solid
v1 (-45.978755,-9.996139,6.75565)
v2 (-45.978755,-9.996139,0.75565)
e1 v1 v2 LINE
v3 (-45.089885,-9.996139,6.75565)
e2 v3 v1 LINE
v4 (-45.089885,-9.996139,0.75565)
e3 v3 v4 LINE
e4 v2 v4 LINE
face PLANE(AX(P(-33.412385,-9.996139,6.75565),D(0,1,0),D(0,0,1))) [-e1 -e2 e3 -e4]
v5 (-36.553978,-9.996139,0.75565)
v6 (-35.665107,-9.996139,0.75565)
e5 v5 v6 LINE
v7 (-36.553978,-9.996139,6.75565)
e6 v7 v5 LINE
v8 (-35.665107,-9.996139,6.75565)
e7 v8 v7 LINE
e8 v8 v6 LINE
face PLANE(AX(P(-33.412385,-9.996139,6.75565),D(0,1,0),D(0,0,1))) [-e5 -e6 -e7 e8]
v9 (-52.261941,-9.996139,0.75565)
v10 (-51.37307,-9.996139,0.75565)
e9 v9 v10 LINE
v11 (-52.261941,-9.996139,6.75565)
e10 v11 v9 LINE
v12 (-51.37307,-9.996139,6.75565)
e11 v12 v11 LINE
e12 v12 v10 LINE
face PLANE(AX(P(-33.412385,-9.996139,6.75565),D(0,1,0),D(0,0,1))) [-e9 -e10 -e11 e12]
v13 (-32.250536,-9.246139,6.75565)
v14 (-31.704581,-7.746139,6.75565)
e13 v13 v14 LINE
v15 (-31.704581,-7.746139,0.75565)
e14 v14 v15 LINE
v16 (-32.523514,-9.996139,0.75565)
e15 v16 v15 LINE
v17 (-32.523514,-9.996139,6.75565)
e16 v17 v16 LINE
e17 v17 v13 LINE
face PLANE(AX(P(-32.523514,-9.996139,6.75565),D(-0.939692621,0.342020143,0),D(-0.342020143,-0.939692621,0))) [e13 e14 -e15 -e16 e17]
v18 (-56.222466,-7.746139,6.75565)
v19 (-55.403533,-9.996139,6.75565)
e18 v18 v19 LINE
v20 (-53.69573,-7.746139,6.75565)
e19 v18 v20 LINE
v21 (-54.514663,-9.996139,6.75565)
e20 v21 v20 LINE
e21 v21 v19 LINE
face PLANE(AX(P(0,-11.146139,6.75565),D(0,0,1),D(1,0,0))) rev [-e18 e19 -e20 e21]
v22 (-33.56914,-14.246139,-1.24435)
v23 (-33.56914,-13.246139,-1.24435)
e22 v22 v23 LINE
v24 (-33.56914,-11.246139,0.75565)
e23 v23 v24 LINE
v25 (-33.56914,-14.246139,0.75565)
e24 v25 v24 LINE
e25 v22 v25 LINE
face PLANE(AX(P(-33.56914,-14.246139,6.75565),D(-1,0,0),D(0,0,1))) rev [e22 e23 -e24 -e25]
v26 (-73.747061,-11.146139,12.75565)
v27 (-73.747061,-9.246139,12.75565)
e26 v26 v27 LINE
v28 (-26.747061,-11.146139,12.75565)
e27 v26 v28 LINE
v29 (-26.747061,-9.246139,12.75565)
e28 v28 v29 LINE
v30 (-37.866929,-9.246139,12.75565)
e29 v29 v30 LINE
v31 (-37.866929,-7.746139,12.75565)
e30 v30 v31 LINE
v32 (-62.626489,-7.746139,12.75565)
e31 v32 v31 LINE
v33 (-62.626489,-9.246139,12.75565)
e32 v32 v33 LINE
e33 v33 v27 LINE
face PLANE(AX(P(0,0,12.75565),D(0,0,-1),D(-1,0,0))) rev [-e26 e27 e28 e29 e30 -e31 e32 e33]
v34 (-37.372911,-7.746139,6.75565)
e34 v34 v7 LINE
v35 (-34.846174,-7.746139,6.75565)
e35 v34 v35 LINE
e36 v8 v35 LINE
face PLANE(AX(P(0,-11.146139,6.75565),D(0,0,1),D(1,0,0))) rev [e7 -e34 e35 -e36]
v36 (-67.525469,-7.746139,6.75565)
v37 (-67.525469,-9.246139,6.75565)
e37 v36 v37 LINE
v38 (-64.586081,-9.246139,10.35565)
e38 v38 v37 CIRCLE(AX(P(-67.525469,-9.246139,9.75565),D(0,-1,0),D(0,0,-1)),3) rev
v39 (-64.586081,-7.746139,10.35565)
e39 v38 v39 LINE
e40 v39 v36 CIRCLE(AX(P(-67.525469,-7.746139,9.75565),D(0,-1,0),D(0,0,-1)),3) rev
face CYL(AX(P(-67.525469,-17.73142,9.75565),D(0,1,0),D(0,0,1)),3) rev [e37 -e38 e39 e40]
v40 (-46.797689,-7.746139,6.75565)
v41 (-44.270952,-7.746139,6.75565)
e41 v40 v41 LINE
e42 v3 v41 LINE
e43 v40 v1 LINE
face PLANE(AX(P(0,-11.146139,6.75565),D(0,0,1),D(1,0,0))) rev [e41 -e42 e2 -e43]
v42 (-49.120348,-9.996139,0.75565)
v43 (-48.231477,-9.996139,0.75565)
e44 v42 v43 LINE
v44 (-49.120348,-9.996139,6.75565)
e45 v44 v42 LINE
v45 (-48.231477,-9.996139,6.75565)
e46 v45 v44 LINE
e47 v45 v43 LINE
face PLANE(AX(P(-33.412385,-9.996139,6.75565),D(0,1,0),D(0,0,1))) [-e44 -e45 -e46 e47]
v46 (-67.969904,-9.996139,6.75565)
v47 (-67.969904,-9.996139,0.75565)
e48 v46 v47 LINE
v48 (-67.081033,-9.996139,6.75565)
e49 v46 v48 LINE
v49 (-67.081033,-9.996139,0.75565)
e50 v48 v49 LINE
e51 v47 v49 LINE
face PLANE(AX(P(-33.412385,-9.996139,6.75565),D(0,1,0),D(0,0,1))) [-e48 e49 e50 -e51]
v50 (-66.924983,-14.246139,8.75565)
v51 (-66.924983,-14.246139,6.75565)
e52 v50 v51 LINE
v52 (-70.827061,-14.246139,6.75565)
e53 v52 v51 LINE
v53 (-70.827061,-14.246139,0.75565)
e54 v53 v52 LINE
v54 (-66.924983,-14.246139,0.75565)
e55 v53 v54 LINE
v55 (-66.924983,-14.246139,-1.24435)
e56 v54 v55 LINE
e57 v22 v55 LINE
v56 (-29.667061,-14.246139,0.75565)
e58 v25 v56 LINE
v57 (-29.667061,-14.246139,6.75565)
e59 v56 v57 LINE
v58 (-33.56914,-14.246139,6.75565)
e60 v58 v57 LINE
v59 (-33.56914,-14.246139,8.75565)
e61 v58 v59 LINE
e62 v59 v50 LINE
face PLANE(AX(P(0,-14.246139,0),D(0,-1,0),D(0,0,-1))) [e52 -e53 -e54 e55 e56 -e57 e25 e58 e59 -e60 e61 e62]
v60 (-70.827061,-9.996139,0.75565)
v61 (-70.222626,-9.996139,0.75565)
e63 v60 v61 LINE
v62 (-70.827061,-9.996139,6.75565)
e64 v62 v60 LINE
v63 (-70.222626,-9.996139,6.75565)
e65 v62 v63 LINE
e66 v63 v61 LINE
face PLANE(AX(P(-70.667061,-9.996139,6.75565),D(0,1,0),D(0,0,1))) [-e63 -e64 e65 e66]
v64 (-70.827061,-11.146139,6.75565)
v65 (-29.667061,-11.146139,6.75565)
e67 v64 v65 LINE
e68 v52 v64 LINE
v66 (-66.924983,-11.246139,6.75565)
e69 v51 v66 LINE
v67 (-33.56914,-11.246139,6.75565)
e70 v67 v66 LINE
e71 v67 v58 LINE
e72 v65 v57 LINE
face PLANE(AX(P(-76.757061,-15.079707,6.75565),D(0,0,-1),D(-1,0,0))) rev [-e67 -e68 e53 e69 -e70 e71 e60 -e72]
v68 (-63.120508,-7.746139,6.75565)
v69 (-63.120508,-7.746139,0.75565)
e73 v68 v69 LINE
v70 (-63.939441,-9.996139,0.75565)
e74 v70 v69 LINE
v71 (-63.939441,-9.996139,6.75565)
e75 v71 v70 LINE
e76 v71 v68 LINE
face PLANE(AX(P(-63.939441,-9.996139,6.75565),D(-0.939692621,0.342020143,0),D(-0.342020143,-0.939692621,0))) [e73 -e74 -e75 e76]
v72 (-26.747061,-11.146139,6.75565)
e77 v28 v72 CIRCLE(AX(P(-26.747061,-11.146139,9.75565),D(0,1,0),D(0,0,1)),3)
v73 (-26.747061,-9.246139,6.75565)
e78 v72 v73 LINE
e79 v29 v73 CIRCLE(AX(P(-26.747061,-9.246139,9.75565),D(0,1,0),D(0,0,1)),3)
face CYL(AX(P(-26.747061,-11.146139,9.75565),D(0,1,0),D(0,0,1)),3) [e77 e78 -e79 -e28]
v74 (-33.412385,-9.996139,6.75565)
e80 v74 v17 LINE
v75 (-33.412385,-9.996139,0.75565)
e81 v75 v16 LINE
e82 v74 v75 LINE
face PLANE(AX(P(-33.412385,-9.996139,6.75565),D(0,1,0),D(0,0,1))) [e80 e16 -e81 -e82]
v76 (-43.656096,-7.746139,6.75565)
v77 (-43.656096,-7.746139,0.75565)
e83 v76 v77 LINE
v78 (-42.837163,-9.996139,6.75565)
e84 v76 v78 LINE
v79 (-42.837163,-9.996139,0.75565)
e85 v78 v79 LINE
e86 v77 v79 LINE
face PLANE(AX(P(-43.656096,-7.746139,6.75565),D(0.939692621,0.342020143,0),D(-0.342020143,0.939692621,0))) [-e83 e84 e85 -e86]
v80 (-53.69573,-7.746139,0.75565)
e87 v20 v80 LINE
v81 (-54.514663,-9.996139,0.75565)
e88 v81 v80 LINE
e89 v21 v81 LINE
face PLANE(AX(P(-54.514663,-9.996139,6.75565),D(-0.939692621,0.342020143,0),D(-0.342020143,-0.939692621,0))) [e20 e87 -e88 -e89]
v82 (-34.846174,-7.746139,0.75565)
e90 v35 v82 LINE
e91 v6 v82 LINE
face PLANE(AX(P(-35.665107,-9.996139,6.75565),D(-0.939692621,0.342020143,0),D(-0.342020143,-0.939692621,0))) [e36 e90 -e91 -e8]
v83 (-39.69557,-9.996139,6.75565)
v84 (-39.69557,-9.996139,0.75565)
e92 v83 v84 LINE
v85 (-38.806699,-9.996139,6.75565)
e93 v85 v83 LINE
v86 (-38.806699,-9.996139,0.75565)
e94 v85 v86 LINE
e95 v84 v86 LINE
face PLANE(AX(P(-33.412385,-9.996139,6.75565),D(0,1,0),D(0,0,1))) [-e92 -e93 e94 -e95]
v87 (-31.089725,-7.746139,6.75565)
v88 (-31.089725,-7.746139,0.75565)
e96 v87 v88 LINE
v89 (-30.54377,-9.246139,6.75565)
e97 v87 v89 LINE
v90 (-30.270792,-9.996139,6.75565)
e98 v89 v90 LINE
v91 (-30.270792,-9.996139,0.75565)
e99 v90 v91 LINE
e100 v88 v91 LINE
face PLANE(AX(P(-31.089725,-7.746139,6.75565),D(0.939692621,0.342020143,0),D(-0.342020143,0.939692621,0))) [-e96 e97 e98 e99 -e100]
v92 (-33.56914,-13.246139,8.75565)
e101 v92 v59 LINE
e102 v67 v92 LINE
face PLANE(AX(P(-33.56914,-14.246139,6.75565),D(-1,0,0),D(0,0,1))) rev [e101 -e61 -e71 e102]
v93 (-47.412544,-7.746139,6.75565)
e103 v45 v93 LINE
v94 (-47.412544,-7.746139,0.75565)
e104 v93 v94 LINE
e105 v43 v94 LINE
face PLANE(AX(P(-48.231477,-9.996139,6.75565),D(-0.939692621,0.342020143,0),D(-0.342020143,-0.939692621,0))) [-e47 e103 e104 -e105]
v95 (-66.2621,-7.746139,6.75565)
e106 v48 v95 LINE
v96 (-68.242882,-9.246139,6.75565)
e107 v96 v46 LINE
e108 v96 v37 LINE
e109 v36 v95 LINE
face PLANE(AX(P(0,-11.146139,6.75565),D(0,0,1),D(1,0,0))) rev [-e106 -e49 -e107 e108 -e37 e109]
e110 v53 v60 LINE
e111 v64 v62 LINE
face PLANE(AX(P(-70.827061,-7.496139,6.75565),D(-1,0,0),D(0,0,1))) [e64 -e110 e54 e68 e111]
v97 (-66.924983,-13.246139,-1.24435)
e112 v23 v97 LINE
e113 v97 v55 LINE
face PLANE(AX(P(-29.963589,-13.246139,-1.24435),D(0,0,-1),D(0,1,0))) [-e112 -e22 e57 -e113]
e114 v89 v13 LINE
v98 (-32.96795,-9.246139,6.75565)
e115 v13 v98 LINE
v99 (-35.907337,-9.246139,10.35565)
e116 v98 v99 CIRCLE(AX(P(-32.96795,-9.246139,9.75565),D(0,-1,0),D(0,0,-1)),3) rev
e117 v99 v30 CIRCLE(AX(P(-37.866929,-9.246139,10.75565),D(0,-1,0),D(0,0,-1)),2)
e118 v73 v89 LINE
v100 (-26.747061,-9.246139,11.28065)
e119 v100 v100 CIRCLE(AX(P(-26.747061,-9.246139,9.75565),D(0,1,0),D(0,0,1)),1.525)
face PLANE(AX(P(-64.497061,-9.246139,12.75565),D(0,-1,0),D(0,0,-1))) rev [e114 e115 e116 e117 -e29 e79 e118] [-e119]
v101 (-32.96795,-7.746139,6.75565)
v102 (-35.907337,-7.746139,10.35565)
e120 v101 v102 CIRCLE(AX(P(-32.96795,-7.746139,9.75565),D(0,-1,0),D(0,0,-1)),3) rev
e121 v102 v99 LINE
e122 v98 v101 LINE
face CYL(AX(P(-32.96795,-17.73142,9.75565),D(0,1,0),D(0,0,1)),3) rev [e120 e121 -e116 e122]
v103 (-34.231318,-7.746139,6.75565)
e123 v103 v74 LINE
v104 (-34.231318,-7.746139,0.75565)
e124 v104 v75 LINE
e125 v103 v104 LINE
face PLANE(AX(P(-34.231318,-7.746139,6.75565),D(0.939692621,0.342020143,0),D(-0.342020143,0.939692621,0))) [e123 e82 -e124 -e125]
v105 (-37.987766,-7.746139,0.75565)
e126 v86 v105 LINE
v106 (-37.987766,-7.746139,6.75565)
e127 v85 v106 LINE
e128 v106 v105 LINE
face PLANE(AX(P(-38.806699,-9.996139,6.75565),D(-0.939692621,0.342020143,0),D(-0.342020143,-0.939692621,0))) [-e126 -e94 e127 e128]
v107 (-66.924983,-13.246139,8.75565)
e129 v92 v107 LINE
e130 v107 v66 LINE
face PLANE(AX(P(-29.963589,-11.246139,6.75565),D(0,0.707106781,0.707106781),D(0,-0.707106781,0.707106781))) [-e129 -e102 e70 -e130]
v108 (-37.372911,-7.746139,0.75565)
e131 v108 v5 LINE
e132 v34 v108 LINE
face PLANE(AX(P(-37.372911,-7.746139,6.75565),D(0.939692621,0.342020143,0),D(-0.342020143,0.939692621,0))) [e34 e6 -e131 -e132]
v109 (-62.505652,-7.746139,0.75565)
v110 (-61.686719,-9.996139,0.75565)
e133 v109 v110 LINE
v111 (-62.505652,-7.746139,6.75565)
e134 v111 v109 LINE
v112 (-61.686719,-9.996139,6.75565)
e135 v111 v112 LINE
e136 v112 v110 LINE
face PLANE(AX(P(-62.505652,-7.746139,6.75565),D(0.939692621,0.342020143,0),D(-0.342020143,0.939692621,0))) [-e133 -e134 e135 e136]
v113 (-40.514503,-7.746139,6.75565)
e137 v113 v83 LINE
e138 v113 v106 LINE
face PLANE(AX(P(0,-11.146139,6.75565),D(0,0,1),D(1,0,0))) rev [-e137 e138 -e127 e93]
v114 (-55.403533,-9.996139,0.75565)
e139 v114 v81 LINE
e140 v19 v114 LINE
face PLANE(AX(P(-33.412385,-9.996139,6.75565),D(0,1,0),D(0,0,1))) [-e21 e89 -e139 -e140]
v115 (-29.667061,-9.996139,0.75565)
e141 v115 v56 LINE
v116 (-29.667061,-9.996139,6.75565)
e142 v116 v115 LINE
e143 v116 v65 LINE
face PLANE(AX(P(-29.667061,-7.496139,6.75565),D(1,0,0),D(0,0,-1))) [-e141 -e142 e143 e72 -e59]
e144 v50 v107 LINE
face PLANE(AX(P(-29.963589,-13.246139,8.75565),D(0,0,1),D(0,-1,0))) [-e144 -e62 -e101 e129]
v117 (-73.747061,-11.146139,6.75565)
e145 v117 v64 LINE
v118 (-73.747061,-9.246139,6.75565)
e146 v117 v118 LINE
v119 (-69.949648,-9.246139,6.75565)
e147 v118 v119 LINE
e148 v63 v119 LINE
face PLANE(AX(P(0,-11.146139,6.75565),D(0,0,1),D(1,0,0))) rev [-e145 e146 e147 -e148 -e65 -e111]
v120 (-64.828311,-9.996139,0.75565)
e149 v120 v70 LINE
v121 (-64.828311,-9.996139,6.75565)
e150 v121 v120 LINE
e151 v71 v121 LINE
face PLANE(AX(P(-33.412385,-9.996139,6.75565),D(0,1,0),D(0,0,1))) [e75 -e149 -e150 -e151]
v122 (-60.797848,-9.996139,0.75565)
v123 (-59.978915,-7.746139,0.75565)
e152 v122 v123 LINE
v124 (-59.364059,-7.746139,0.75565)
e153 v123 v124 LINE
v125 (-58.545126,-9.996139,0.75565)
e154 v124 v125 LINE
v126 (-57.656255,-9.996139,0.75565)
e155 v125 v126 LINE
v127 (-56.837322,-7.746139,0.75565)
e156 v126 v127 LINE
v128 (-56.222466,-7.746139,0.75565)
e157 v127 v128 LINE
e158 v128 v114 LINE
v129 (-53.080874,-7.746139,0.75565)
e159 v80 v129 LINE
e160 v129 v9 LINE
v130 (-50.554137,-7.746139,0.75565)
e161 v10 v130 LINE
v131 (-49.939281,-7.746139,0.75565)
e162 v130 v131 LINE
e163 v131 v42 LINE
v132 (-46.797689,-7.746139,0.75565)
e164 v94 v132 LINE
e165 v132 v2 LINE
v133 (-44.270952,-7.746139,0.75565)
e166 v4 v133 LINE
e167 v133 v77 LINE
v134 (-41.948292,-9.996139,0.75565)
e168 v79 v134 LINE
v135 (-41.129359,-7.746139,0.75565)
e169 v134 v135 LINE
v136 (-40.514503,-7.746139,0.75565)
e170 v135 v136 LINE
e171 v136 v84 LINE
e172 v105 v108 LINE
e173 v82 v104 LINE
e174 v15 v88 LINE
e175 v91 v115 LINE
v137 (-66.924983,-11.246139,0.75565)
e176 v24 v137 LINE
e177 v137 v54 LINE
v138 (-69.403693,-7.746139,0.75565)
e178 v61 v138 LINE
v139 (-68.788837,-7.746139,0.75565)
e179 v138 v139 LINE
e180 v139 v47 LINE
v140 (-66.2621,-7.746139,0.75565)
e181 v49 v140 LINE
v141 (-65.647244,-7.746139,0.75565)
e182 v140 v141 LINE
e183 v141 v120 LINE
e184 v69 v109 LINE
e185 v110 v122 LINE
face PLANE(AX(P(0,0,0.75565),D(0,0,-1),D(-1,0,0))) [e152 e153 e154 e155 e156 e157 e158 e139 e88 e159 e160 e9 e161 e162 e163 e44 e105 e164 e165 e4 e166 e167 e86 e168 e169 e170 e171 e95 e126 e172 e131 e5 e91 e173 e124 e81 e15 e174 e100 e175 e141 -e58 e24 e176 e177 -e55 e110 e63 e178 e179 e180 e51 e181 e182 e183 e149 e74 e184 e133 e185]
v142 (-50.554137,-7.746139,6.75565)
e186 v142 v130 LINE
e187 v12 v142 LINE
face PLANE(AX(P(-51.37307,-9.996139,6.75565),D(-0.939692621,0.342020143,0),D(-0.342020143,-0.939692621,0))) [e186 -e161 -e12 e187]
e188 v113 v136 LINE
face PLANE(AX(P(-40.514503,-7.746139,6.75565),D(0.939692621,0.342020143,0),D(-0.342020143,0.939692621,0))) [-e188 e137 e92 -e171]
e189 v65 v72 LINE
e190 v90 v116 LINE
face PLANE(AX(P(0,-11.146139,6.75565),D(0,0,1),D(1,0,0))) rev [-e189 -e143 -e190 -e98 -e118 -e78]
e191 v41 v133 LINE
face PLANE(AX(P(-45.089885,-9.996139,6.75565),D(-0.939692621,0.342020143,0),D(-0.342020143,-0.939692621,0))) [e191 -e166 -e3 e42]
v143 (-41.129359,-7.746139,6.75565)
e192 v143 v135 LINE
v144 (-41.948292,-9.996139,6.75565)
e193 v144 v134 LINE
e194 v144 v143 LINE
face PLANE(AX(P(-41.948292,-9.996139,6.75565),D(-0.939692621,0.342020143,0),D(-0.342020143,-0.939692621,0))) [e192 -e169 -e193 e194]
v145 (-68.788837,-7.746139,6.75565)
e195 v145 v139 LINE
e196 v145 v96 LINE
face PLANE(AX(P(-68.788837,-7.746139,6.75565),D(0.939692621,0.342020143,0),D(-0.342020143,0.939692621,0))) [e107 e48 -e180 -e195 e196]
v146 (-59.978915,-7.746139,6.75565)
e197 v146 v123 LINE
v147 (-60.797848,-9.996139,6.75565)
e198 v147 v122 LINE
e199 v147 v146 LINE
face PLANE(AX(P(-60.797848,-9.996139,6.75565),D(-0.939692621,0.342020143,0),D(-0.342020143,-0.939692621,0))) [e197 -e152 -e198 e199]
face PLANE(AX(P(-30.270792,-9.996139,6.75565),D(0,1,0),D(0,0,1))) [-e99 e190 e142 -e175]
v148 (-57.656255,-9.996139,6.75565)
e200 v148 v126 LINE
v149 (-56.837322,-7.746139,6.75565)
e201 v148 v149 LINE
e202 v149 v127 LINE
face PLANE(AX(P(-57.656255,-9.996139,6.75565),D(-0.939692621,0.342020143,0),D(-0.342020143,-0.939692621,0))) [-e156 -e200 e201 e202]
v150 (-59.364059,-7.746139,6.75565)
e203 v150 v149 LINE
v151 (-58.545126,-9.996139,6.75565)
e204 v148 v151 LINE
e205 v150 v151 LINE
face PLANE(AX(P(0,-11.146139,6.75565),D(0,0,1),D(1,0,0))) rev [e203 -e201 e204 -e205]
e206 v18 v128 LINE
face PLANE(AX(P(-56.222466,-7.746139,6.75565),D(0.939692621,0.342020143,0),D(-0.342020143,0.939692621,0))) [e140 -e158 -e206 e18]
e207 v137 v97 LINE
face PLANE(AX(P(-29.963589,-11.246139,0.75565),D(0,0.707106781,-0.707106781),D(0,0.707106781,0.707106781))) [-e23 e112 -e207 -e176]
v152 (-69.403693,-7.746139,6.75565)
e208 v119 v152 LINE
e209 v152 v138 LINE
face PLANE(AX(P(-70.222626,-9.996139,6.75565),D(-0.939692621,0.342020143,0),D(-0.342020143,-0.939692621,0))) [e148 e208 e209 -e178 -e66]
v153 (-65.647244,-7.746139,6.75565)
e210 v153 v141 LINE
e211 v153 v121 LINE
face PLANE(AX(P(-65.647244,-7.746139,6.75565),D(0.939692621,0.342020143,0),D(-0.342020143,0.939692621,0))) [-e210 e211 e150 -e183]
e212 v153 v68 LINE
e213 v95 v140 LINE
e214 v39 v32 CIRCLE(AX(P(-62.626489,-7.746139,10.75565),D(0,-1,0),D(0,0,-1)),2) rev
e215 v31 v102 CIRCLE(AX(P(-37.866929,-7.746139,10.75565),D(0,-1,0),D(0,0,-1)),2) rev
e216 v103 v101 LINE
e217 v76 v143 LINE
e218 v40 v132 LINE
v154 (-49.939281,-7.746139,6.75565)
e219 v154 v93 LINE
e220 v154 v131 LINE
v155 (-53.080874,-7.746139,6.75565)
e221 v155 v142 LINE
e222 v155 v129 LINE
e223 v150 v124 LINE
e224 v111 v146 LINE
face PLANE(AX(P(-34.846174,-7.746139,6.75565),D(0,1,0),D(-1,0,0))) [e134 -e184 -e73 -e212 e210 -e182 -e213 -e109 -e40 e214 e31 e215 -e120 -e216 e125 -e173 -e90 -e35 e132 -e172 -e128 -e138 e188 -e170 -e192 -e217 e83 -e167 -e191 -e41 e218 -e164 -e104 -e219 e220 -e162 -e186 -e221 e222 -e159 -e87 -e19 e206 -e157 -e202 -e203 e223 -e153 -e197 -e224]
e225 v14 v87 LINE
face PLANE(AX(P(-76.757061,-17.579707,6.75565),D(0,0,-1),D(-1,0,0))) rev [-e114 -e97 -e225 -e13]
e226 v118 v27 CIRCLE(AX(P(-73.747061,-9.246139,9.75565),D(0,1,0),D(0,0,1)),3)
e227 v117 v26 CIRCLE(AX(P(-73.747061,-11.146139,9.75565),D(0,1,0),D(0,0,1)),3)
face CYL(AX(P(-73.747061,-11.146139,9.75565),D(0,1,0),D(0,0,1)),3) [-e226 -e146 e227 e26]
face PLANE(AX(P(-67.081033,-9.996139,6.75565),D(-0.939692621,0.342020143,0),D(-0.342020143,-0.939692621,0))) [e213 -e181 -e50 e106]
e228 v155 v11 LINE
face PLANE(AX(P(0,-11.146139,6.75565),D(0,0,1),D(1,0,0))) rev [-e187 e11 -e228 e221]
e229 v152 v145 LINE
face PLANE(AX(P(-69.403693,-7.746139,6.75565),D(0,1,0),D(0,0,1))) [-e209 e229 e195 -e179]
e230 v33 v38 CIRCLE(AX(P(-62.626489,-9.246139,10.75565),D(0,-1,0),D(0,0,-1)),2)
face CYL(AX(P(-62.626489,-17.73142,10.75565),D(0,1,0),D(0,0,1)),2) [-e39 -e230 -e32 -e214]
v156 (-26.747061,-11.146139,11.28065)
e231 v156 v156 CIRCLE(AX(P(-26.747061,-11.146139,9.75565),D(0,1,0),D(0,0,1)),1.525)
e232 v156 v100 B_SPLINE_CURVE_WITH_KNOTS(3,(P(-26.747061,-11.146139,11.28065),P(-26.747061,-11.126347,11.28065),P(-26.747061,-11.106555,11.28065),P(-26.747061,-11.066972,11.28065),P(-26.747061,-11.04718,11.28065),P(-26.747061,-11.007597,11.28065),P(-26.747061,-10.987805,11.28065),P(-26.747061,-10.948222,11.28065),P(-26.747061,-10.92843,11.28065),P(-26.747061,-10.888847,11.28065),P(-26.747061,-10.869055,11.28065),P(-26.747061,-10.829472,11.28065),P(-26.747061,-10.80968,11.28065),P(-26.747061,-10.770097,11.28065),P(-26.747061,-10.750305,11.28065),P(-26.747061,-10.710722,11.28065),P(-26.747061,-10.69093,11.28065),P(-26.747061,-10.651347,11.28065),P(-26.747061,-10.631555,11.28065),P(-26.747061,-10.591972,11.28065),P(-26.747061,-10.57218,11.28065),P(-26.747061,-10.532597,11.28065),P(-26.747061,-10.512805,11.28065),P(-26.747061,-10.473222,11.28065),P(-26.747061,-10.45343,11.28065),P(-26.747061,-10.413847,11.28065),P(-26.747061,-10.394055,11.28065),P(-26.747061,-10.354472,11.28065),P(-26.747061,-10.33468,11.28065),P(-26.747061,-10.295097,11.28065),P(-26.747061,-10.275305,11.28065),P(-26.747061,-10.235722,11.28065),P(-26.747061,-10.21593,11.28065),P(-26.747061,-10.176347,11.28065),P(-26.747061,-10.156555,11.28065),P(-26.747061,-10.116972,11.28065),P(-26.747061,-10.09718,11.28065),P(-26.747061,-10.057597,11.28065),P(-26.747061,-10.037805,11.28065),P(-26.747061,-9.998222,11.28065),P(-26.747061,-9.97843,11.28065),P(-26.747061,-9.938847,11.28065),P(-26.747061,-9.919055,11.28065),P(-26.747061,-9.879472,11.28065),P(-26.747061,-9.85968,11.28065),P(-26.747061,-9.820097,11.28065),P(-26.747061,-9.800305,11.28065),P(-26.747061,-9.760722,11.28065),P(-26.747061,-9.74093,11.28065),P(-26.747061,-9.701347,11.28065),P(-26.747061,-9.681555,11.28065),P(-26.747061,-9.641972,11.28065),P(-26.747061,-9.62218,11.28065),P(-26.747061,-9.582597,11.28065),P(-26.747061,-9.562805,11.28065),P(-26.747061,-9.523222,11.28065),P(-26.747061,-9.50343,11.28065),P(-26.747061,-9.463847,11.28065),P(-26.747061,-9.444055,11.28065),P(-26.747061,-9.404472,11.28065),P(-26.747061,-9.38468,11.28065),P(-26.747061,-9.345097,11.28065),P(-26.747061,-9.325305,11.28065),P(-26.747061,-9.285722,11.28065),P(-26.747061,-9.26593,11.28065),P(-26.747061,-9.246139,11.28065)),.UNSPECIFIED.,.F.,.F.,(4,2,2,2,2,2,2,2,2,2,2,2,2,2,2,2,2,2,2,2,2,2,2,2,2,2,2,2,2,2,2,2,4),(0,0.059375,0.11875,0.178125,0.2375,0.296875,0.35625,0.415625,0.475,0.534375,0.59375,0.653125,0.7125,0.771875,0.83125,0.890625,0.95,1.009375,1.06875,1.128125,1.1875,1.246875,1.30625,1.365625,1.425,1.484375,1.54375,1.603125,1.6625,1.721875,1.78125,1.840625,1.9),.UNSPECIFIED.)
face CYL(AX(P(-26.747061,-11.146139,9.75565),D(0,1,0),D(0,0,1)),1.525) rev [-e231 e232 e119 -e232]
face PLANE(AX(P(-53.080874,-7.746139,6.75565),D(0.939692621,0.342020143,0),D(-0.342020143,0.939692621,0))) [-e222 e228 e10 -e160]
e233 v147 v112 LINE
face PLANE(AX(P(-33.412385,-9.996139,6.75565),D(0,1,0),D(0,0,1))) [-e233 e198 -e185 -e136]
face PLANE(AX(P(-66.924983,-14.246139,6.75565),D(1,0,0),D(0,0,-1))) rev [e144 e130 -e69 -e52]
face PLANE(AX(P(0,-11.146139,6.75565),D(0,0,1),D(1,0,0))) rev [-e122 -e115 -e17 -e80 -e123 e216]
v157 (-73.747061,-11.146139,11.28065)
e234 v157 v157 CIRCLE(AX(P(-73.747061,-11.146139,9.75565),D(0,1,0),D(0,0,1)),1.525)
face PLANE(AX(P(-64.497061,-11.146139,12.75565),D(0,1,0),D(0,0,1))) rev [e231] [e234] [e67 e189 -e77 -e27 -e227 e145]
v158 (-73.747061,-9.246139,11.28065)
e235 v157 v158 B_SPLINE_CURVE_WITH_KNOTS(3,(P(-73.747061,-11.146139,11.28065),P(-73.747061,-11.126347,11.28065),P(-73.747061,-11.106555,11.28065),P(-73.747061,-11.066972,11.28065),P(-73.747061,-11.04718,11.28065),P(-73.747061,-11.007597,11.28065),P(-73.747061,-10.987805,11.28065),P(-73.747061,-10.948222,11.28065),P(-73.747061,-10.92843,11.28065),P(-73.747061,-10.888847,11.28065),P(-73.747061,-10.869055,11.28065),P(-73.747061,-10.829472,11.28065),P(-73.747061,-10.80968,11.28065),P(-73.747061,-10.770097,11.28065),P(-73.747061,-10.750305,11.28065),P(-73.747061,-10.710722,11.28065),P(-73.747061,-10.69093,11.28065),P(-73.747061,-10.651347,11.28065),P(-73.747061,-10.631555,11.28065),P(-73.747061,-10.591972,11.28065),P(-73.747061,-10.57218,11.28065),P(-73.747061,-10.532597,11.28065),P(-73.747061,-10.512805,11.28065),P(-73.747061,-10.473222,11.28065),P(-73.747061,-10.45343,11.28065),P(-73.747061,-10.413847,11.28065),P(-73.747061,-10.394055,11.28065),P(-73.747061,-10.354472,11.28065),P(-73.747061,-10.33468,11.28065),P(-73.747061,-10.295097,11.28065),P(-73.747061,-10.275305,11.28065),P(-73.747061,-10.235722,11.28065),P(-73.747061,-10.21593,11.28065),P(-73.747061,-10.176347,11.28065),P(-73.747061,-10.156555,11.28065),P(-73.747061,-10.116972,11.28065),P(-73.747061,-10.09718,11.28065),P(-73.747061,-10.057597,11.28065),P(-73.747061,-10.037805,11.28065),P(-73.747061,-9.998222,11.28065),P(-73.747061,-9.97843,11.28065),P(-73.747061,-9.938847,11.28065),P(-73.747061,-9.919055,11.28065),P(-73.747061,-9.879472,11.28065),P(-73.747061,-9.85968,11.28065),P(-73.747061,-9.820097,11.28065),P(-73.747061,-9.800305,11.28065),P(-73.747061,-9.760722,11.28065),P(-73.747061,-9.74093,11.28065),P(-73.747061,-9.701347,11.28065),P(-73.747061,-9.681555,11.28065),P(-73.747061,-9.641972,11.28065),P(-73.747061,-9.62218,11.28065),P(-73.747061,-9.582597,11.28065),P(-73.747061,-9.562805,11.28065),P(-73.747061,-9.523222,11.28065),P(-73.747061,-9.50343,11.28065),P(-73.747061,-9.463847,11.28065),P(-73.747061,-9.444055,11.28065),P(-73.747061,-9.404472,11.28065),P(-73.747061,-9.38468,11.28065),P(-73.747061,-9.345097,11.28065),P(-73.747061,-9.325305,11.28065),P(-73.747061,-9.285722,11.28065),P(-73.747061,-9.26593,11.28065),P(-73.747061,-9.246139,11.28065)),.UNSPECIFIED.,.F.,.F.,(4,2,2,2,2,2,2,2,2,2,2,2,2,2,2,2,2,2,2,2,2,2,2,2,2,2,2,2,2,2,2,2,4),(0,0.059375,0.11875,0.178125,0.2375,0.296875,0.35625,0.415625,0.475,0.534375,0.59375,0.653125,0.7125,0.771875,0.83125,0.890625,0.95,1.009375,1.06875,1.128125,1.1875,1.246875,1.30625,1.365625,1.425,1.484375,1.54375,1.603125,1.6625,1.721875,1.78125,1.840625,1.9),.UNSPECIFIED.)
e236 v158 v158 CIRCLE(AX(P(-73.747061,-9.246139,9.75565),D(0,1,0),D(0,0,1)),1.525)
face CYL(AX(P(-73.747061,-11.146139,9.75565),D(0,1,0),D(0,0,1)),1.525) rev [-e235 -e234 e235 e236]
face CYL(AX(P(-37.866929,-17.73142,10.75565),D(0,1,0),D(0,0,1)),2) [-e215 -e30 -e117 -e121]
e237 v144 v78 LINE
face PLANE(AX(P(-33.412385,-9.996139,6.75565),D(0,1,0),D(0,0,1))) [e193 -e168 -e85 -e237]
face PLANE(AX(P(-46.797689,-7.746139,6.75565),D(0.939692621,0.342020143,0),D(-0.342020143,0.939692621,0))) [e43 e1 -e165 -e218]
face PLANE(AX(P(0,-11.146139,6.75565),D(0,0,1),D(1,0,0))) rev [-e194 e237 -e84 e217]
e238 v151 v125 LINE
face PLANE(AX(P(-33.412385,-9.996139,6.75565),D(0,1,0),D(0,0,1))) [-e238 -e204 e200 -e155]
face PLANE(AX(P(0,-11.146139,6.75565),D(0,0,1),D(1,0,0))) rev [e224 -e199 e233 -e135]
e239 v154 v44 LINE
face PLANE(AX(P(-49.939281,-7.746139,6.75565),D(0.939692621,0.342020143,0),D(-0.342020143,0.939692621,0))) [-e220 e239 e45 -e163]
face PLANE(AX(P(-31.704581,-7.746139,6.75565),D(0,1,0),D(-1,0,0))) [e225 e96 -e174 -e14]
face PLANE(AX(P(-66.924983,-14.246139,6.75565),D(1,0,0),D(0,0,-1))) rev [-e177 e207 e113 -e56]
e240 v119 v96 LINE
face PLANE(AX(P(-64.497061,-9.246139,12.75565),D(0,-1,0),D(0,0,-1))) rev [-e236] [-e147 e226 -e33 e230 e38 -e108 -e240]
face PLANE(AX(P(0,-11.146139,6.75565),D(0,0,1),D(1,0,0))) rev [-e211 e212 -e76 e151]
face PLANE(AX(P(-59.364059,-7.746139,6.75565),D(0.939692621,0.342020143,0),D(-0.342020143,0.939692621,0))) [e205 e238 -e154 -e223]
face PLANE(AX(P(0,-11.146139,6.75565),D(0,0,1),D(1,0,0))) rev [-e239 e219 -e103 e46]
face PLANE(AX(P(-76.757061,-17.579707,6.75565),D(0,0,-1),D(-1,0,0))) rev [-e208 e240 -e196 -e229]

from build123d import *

# Parameters (mm, degrees)
BOSS_EXTRUDE1_DEPTH              = 6
SKETCH4_W                        = 33.355842528
SKETCH4_H                        = 6
BOSS_EXTRUDE3_DEPTH              = 3
BOSS_EXTRUDE4_DEPTH              = 33.355842528
SKETCH17_W                       = 28.5
SKETCH17_H                       = 1.9
BOSS_EXTRUDE11_DEPTH             = 6
SKETCH18_R                       = 1.525
BOSS_EXTRUDE12_DEPTH             = 1.9
SKETCH20_W                       = 34.55751915
SKETCH20_H                       = 1.75
BOSS_EXTRUDE13_DEPTH             = 6
SKETCH21_R                       = 3
CUT_EXTRUDE3_DEPTH               = 1.75
FILLET2_START                    = -9.24613882
FILLET2_DEPTH                    = 1.75
BOSS_EXTRUDE14_REACH             = 49.223
SKETCH22_W                       = 6
SKETCH22_H                       = 3
BOSS_EXTRUDE14_DIRECTION_2_REACH = 49.223
SPLIT1_START                     = -66.92498259
SPLIT1_DEPTH                     = 33.355842528
SPLIT1_START_2                   = -11.14613882
SPLIT1_2_DEPTH                   = 3.65
SPLIT1_3_OUTLINE_R               = 1.525
SPLIT1_3_DEPTH                   = 1.9
SPLIT1_START_3                   = 6.755649514
SPLIT1_4_DEPTH                   = 6
SKETCH26_W                       = 6
SKETCH26_H                       = 2.5
CUT_EXTRUDE4_DEPTH               = 51.815209001
SKETCH27_W                       = 6
SKETCH27_H                       = 0.25
CUT_EXTRUDE5_DEPTH               = 80.093428855


with BuildPart() as part:
    # Sketch1 → Boss-Extrude1 (new body)
    with BuildSketch(Plane(origin=(0, 0, 0.755649514), x_dir=(-1, 0, 0), z_dir=(0, 0, -1))):
        Polygon((31.089725273, -5.24613882), (30.270792245, -7.49613882), (29.667061326, -7.49613882), (29.667061326, -11.24613882), (70.667061326, -11.24613882), (70.827061326, -11.24613882), (70.827061326, -7.49613882), (70.667061326, -7.49613882), (70.222625956, -7.49613882), (69.403692929, -5.24613882), (68.788837073, -5.24613882), (67.969904045, -7.49613882), (67.081033306, -7.49613882), (66.262100279, -5.24613882), (65.647244423, -5.24613882), (64.828311395, -7.49613882), (63.939440656, -7.49613882), (63.120507629, -5.24613882), (62.505651773, -5.24613882), (61.686718745, -7.49613882), (60.797848006, -7.49613882), (59.978914979, -5.24613882), (59.364059123, -5.24613882), (58.545126095, -7.49613882), (57.656255356, -7.49613882), (56.837322329, -5.24613882), (56.222466473, -5.24613882), (55.403533445, -7.49613882), (54.514662706, -7.49613882), (53.695729679, -5.24613882), (53.080873823, -5.24613882), (52.261940795, -7.49613882), (51.373070056, -7.49613882), (50.554137029, -5.24613882), (49.939281173, -5.24613882), (49.120348145, -7.49613882), (48.231477406, -7.49613882), (47.412544379, -5.24613882), (46.797688523, -5.24613882), (45.978755495, -7.49613882), (45.089884756, -7.49613882), (44.270951729, -5.24613882), (43.656095873, -5.24613882), (42.837162845, -7.49613882), (41.948292106, -7.49613882), (41.129359079, -5.24613882), (40.514503223, -5.24613882), (39.695570195, -7.49613882), (38.806699456, -7.49613882), (37.987766429, -5.24613882), (37.372910573, -5.24613882), (36.553977545, -7.49613882), (35.665106806, -7.49613882), (34.846173779, -5.24613882), (34.231317923, -5.24613882), (33.412384895, -7.49613882), (32.523514156, -7.49613882), (31.704581129, -5.24613882), align=None)
    extrude(amount=-BOSS_EXTRUDE1_DEPTH)

    # Sketch4 → Boss-Extrude3 (add)
    with BuildSketch(Plane.XZ.offset(11.24613882)):
        with Locations((-50.247061326, 3.755649514)):
            Rectangle(SKETCH4_W, SKETCH4_H)
    extrude(amount=BOSS_EXTRUDE3_DEPTH)

    # Sketch5 → Boss-Extrude4 (add)
    with BuildSketch(Plane.ZY.offset(66.92498259)):
        Polygon((0.755649514, -11.24613882), (-1.244350486, -13.24613882), (-1.244350486, -14.24613882), (0.755649514, -14.24613882), align=None)
        Polygon((8.755649514, -13.24613882), (8.755649514, -14.24613882), (6.755649514, -14.24613882), (6.755649514, -11.24613882), align=None)
    extrude(amount=-BOSS_EXTRUDE4_DEPTH)

    # Sketch17 → Boss-Extrude11 (add)
    with BuildSketch(Plane.XY.offset(6.755649514)):
        with Locations((-50.247061326, -10.19613882)):
            Rectangle(SKETCH17_W, SKETCH17_H)
    extrude(amount=BOSS_EXTRUDE11_DEPTH)

    # Sketch18 → Boss-Extrude12 (add)
    with BuildSketch(Plane(origin=(0, -9.24613882, 0), x_dir=(1, 0, 0), z_dir=(0, 1, 0))):
        with BuildLine():
            Line((-73.747061326, -6.755649514), (-26.747061326, -6.755649514))
            ThreePointArc((-26.747061326, -6.755649514), (-23.747061326, -9.755649514), (-26.747061326, -12.755649514))
            Line((-26.747061326, -12.755649514), (-73.747061326, -12.755649514))
            ThreePointArc((-73.747061326, -12.755649514), (-76.747061326, -9.755649514), (-73.747061326, -6.755649514))
        make_face()
        with Locations(Location((-73.747061326, -9.755649514, 0), (0, 0, 270))):
            Circle(SKETCH18_R, mode=Mode.SUBTRACT)
        with Locations(Location((-26.747061326, -9.755649514, 0), (0, 0, 270))):
            Circle(SKETCH18_R, mode=Mode.SUBTRACT)
    extrude(amount=-BOSS_EXTRUDE12_DEPTH)

    # Sketch20 → Boss-Extrude13 (add)
    with BuildSketch(Plane.XY.offset(6.755649514)):
        with Locations((-50.246709101, -8.37113882)):
            Rectangle(SKETCH20_W, SKETCH20_H)
    extrude(amount=BOSS_EXTRUDE13_DEPTH)

    # Sketch21 → Cut-Extrude3 (cut)
    with BuildSketch(Plane(origin=(0, -7.49613882, 0), x_dir=(1, 0, 0), z_dir=(0, 1, 0))):
        with Locations((-67.525468676, -9.755649514)):
            Circle(SKETCH21_R)
        with Locations((-32.967949526, -9.755649514)):
            Circle(SKETCH21_R)
    extrude(amount=-CUT_EXTRUDE3_DEPTH, mode=Mode.SUBTRACT)

    # Fillet2: read off the stored shape, not the designer's step
    # Fillet2 outline → Fillet2 (cut)
    with BuildSketch(Plane(origin=(0, 0, 0), x_dir=(1, 0, 0), z_dir=(0, 1, 0)).offset(FILLET2_START)):
        with BuildLine():
            ThreePointArc((-35.907337217, -10.355649514), (-36.317735672, -12.020560578), (-37.866929011, -12.755649514))
            Line((-37.866929011, -12.755649514), (-32.967949526, -12.755649514))
            ThreePointArc((-32.967949526, -12.755649514), (-34.865316122, -12.079439522), (-35.907337217, -10.355649514))
        make_face()
        with BuildLine():
            ThreePointArc((-62.62648919, -12.755649514), (-64.175682529, -12.020560579), (-64.586080984, -10.355649514))
            ThreePointArc((-64.586080984, -10.355649514), (-65.62810208, -12.079439522), (-67.525468676, -12.755649514))
            Line((-67.525468676, -12.755649514), (-62.62648919, -12.755649514))
        make_face()
    extrude(amount=FILLET2_DEPTH, mode=Mode.SUBTRACT)

    # Boss-Extrude14: up to this face of the body (flat: up to its plane)
    boss_extrude14_end = Plane(part.part.faces().sort_by_distance((-70.827061326, -9.37113882, 3.755649514))[0])
    # Sketch22 → Boss-Extrude14 (add, up to the picked face)
    with BuildSketch(Plane.ZY.offset(66.92498259), mode=Mode.PRIVATE) as boss_extrude14_sk1:
        with Locations((3.755649514, -12.74613882)):
            Rectangle(SKETCH22_W, SKETCH22_H)
    boss_extrude14_tool1 = split(extrude(boss_extrude14_sk1.sketch, amount=BOSS_EXTRUDE14_REACH, mode=Mode.PRIVATE), bisect_by=boss_extrude14_end, keep=Keep.BOTH, mode=Mode.PRIVATE)
    add(boss_extrude14_tool1.solids().sort_by(Axis((-66.924983, -12.746139, 3.75565), (-1, 0, 0)))[0])

    # Boss-Extrude14 direction 2: up to this face of the body (flat: up to its plane)
    boss_extrude14_direction_2_end = Plane(part.part.faces().sort_by_distance((-29.667061326, -9.37113882, 3.755649514))[0])
    # Sketch22 → Boss-Extrude14 direction 2 (add, up to the picked face)
    with BuildSketch(Plane.ZY.offset(66.92498259), mode=Mode.PRIVATE) as boss_extrude14_direction_2_sk1:
        with Locations((3.755649514, -12.74613882)):
            Rectangle(SKETCH22_W, SKETCH22_H)
    boss_extrude14_direction_2_tool1 = split(extrude(boss_extrude14_direction_2_sk1.sketch, amount=-BOSS_EXTRUDE14_DIRECTION_2_REACH, mode=Mode.PRIVATE), bisect_by=boss_extrude14_direction_2_end, keep=Keep.BOTH, mode=Mode.PRIVATE)
    add(boss_extrude14_direction_2_tool1.solids().sort_by(Axis((-66.924983, -12.746139, 3.75565), (1, 0, 0)))[0])

    # Split1 4 outline → Split1 4 (cut)
    with BuildSketch(Plane.XY.offset(SPLIT1_START_3)):
        Polygon((-66.92498259, -14.24613882), (-33.569140062, -14.24613882), (-33.569140062, -11.14613882), (-22, -11.14613882), (-22, -7.49613882), (-78, -7.49613882), (-78, -11.14613882), (-66.92498259, -11.14613882), align=None)
    extrude(amount=SPLIT1_4_DEPTH, mode=Mode.SUBTRACT)

    # Sketch26 → Cut-Extrude4 (cut, through all)
    with BuildSketch(Plane(origin=(-29.667061326, 0, 0), x_dir=(0, 0, -1), z_dir=(1, 0, 0))):
        with Locations((-3.755649514, -9.24613882)):
            Rectangle(SKETCH26_W, SKETCH26_H)
    extrude(amount=-CUT_EXTRUDE4_DEPTH, mode=Mode.SUBTRACT)


with BuildPart() as body_2:
    # Split1: read off the stored shape, not the designer's step
    # Split1 outline → Split1 (new body)
    with BuildSketch(Plane.YZ.offset(SPLIT1_START)):
        Polygon((-14.24613882, 8.755649514), (-14.24613882, 6.755649514), (-11.24613882, 6.755649514), (-13.24613882, 8.755649514), align=None)
    extrude(amount=SPLIT1_DEPTH)


with BuildPart() as body_3:
    # Split1 2 outline → Split1 2 (new body)
    with BuildSketch(Plane(origin=(0, 0, 0), x_dir=(1, 0, 0), z_dir=(0, 1, 0)).offset(SPLIT1_START_2)):
        with BuildLine():
            Line((-32.967949526, -6.755649514), (-67.525468676, -6.755649514))
            ThreePointArc((-67.525468676, -6.755649514), (-65.201678668, -7.858282918), (-64.586080984, -10.355649514))
            ThreePointArc((-64.586080984, -10.355649514), (-64.175682529, -12.020560579), (-62.62648919, -12.755649514))
            Line((-62.62648919, -12.755649514), (-37.866929011, -12.755649514))
            ThreePointArc((-37.866929011, -12.755649514), (-36.317735672, -12.020560578), (-35.907337217, -10.355649514))
            ThreePointArc((-35.907337217, -10.355649514), (-35.291739533, -7.858282918), (-32.967949526, -6.755649514))
        make_face()
    extrude(amount=SPLIT1_2_DEPTH)

    # Split1 3 outline → Split1 3 (add)
    # profile 1 of 2: a face of its own
    with BuildSketch(Plane(origin=(0, 0, 0), x_dir=(1, 0, 0), z_dir=(0, 1, 0)).offset(SPLIT1_START_2)):
        with BuildLine():
            Line((-67.525468676, -6.755649514), (-73.747061326, -6.755649514))
            ThreePointArc((-73.747061326, -6.755649514), (-76.747061326, -9.755649514), (-73.747061326, -12.755649514))
            Line((-73.747061326, -12.755649514), (-62.62648919, -12.755649514))
            ThreePointArc((-62.62648919, -12.755649514), (-64.175682529, -12.020560579), (-64.586080984, -10.355649514))
            ThreePointArc((-64.586080984, -10.355649514), (-65.201678668, -7.858282918), (-67.525468676, -6.755649514))
        make_face()
        with Locations((-73.747061326, -9.755649514)):
            Circle(SPLIT1_3_OUTLINE_R, mode=Mode.SUBTRACT)
    # profile 2 of 2: a face of its own
    with BuildSketch(Plane(origin=(0, 0, 0), x_dir=(1, 0, 0), z_dir=(0, 1, 0)).offset(SPLIT1_START_2)):
        with BuildLine():
            Line((-26.747061326, -6.755649514), (-32.967949526, -6.755649514))
            ThreePointArc((-32.967949526, -6.755649514), (-35.291739533, -7.858282918), (-35.907337217, -10.355649514))
            ThreePointArc((-35.907337217, -10.355649514), (-36.317735672, -12.020560578), (-37.866929011, -12.755649514))
            Line((-37.866929011, -12.755649514), (-26.747061326, -12.755649514))
            ThreePointArc((-26.747061326, -12.755649514), (-23.747061326, -9.755649514), (-26.747061326, -6.755649514))
        make_face()
        with Locations((-26.747061326, -9.755649514)):
            Circle(SPLIT1_3_OUTLINE_R, mode=Mode.SUBTRACT)
    extrude(amount=SPLIT1_3_DEPTH)


with BuildPart() as cut_extrude4_piece_1:
    # of the separate pieces the step leaves, piece 1, a body of its own (cut_extrude4_pieces)
    add(part.part.solids().sort_by_distance((-29.667061326, -10.49613882, 0.755649514))[0])


with BuildPart() as cut_extrude4_piece_2:
    # of the separate pieces the step leaves, piece 2, a body of its own (cut_extrude4_pieces)
    add(part.part.solids().sort_by_distance((-31.089725273, -5.24613882, 0.755649514))[0])


with BuildPart() as cut_extrude4_piece_2_1:
    # Body-Move/Copy1: read off the stored shape, not the designer's step
    # Body-Move/Copy1: moved
    add(cut_extrude4_piece_2.part.moved(Location((0, -2.5, 0))))


with BuildPart() as cut_extrude4_piece_1_1:
    add(cut_extrude4_piece_1.part)

    # Combine1: union Cut-Extrude4 piece 2, body 3, body 2
    add(cut_extrude4_piece_2_1.part)
    add(body_3.part)
    add(body_2.part)

    # Sketch27 → Cut-Extrude5 (cut, through all)
    with BuildSketch(Plane(origin=(0, 0, 0), x_dir=(0, 0, -1), z_dir=(1, 0, 0))):
        with Locations((-9.755649514, -7.62113882)):
            Rectangle(SKETCH27_W, SKETCH27_H)
    extrude(amount=-CUT_EXTRUDE5_DEPTH, mode=Mode.SUBTRACT)


solid = cut_extrude4_piece_1_1.part
